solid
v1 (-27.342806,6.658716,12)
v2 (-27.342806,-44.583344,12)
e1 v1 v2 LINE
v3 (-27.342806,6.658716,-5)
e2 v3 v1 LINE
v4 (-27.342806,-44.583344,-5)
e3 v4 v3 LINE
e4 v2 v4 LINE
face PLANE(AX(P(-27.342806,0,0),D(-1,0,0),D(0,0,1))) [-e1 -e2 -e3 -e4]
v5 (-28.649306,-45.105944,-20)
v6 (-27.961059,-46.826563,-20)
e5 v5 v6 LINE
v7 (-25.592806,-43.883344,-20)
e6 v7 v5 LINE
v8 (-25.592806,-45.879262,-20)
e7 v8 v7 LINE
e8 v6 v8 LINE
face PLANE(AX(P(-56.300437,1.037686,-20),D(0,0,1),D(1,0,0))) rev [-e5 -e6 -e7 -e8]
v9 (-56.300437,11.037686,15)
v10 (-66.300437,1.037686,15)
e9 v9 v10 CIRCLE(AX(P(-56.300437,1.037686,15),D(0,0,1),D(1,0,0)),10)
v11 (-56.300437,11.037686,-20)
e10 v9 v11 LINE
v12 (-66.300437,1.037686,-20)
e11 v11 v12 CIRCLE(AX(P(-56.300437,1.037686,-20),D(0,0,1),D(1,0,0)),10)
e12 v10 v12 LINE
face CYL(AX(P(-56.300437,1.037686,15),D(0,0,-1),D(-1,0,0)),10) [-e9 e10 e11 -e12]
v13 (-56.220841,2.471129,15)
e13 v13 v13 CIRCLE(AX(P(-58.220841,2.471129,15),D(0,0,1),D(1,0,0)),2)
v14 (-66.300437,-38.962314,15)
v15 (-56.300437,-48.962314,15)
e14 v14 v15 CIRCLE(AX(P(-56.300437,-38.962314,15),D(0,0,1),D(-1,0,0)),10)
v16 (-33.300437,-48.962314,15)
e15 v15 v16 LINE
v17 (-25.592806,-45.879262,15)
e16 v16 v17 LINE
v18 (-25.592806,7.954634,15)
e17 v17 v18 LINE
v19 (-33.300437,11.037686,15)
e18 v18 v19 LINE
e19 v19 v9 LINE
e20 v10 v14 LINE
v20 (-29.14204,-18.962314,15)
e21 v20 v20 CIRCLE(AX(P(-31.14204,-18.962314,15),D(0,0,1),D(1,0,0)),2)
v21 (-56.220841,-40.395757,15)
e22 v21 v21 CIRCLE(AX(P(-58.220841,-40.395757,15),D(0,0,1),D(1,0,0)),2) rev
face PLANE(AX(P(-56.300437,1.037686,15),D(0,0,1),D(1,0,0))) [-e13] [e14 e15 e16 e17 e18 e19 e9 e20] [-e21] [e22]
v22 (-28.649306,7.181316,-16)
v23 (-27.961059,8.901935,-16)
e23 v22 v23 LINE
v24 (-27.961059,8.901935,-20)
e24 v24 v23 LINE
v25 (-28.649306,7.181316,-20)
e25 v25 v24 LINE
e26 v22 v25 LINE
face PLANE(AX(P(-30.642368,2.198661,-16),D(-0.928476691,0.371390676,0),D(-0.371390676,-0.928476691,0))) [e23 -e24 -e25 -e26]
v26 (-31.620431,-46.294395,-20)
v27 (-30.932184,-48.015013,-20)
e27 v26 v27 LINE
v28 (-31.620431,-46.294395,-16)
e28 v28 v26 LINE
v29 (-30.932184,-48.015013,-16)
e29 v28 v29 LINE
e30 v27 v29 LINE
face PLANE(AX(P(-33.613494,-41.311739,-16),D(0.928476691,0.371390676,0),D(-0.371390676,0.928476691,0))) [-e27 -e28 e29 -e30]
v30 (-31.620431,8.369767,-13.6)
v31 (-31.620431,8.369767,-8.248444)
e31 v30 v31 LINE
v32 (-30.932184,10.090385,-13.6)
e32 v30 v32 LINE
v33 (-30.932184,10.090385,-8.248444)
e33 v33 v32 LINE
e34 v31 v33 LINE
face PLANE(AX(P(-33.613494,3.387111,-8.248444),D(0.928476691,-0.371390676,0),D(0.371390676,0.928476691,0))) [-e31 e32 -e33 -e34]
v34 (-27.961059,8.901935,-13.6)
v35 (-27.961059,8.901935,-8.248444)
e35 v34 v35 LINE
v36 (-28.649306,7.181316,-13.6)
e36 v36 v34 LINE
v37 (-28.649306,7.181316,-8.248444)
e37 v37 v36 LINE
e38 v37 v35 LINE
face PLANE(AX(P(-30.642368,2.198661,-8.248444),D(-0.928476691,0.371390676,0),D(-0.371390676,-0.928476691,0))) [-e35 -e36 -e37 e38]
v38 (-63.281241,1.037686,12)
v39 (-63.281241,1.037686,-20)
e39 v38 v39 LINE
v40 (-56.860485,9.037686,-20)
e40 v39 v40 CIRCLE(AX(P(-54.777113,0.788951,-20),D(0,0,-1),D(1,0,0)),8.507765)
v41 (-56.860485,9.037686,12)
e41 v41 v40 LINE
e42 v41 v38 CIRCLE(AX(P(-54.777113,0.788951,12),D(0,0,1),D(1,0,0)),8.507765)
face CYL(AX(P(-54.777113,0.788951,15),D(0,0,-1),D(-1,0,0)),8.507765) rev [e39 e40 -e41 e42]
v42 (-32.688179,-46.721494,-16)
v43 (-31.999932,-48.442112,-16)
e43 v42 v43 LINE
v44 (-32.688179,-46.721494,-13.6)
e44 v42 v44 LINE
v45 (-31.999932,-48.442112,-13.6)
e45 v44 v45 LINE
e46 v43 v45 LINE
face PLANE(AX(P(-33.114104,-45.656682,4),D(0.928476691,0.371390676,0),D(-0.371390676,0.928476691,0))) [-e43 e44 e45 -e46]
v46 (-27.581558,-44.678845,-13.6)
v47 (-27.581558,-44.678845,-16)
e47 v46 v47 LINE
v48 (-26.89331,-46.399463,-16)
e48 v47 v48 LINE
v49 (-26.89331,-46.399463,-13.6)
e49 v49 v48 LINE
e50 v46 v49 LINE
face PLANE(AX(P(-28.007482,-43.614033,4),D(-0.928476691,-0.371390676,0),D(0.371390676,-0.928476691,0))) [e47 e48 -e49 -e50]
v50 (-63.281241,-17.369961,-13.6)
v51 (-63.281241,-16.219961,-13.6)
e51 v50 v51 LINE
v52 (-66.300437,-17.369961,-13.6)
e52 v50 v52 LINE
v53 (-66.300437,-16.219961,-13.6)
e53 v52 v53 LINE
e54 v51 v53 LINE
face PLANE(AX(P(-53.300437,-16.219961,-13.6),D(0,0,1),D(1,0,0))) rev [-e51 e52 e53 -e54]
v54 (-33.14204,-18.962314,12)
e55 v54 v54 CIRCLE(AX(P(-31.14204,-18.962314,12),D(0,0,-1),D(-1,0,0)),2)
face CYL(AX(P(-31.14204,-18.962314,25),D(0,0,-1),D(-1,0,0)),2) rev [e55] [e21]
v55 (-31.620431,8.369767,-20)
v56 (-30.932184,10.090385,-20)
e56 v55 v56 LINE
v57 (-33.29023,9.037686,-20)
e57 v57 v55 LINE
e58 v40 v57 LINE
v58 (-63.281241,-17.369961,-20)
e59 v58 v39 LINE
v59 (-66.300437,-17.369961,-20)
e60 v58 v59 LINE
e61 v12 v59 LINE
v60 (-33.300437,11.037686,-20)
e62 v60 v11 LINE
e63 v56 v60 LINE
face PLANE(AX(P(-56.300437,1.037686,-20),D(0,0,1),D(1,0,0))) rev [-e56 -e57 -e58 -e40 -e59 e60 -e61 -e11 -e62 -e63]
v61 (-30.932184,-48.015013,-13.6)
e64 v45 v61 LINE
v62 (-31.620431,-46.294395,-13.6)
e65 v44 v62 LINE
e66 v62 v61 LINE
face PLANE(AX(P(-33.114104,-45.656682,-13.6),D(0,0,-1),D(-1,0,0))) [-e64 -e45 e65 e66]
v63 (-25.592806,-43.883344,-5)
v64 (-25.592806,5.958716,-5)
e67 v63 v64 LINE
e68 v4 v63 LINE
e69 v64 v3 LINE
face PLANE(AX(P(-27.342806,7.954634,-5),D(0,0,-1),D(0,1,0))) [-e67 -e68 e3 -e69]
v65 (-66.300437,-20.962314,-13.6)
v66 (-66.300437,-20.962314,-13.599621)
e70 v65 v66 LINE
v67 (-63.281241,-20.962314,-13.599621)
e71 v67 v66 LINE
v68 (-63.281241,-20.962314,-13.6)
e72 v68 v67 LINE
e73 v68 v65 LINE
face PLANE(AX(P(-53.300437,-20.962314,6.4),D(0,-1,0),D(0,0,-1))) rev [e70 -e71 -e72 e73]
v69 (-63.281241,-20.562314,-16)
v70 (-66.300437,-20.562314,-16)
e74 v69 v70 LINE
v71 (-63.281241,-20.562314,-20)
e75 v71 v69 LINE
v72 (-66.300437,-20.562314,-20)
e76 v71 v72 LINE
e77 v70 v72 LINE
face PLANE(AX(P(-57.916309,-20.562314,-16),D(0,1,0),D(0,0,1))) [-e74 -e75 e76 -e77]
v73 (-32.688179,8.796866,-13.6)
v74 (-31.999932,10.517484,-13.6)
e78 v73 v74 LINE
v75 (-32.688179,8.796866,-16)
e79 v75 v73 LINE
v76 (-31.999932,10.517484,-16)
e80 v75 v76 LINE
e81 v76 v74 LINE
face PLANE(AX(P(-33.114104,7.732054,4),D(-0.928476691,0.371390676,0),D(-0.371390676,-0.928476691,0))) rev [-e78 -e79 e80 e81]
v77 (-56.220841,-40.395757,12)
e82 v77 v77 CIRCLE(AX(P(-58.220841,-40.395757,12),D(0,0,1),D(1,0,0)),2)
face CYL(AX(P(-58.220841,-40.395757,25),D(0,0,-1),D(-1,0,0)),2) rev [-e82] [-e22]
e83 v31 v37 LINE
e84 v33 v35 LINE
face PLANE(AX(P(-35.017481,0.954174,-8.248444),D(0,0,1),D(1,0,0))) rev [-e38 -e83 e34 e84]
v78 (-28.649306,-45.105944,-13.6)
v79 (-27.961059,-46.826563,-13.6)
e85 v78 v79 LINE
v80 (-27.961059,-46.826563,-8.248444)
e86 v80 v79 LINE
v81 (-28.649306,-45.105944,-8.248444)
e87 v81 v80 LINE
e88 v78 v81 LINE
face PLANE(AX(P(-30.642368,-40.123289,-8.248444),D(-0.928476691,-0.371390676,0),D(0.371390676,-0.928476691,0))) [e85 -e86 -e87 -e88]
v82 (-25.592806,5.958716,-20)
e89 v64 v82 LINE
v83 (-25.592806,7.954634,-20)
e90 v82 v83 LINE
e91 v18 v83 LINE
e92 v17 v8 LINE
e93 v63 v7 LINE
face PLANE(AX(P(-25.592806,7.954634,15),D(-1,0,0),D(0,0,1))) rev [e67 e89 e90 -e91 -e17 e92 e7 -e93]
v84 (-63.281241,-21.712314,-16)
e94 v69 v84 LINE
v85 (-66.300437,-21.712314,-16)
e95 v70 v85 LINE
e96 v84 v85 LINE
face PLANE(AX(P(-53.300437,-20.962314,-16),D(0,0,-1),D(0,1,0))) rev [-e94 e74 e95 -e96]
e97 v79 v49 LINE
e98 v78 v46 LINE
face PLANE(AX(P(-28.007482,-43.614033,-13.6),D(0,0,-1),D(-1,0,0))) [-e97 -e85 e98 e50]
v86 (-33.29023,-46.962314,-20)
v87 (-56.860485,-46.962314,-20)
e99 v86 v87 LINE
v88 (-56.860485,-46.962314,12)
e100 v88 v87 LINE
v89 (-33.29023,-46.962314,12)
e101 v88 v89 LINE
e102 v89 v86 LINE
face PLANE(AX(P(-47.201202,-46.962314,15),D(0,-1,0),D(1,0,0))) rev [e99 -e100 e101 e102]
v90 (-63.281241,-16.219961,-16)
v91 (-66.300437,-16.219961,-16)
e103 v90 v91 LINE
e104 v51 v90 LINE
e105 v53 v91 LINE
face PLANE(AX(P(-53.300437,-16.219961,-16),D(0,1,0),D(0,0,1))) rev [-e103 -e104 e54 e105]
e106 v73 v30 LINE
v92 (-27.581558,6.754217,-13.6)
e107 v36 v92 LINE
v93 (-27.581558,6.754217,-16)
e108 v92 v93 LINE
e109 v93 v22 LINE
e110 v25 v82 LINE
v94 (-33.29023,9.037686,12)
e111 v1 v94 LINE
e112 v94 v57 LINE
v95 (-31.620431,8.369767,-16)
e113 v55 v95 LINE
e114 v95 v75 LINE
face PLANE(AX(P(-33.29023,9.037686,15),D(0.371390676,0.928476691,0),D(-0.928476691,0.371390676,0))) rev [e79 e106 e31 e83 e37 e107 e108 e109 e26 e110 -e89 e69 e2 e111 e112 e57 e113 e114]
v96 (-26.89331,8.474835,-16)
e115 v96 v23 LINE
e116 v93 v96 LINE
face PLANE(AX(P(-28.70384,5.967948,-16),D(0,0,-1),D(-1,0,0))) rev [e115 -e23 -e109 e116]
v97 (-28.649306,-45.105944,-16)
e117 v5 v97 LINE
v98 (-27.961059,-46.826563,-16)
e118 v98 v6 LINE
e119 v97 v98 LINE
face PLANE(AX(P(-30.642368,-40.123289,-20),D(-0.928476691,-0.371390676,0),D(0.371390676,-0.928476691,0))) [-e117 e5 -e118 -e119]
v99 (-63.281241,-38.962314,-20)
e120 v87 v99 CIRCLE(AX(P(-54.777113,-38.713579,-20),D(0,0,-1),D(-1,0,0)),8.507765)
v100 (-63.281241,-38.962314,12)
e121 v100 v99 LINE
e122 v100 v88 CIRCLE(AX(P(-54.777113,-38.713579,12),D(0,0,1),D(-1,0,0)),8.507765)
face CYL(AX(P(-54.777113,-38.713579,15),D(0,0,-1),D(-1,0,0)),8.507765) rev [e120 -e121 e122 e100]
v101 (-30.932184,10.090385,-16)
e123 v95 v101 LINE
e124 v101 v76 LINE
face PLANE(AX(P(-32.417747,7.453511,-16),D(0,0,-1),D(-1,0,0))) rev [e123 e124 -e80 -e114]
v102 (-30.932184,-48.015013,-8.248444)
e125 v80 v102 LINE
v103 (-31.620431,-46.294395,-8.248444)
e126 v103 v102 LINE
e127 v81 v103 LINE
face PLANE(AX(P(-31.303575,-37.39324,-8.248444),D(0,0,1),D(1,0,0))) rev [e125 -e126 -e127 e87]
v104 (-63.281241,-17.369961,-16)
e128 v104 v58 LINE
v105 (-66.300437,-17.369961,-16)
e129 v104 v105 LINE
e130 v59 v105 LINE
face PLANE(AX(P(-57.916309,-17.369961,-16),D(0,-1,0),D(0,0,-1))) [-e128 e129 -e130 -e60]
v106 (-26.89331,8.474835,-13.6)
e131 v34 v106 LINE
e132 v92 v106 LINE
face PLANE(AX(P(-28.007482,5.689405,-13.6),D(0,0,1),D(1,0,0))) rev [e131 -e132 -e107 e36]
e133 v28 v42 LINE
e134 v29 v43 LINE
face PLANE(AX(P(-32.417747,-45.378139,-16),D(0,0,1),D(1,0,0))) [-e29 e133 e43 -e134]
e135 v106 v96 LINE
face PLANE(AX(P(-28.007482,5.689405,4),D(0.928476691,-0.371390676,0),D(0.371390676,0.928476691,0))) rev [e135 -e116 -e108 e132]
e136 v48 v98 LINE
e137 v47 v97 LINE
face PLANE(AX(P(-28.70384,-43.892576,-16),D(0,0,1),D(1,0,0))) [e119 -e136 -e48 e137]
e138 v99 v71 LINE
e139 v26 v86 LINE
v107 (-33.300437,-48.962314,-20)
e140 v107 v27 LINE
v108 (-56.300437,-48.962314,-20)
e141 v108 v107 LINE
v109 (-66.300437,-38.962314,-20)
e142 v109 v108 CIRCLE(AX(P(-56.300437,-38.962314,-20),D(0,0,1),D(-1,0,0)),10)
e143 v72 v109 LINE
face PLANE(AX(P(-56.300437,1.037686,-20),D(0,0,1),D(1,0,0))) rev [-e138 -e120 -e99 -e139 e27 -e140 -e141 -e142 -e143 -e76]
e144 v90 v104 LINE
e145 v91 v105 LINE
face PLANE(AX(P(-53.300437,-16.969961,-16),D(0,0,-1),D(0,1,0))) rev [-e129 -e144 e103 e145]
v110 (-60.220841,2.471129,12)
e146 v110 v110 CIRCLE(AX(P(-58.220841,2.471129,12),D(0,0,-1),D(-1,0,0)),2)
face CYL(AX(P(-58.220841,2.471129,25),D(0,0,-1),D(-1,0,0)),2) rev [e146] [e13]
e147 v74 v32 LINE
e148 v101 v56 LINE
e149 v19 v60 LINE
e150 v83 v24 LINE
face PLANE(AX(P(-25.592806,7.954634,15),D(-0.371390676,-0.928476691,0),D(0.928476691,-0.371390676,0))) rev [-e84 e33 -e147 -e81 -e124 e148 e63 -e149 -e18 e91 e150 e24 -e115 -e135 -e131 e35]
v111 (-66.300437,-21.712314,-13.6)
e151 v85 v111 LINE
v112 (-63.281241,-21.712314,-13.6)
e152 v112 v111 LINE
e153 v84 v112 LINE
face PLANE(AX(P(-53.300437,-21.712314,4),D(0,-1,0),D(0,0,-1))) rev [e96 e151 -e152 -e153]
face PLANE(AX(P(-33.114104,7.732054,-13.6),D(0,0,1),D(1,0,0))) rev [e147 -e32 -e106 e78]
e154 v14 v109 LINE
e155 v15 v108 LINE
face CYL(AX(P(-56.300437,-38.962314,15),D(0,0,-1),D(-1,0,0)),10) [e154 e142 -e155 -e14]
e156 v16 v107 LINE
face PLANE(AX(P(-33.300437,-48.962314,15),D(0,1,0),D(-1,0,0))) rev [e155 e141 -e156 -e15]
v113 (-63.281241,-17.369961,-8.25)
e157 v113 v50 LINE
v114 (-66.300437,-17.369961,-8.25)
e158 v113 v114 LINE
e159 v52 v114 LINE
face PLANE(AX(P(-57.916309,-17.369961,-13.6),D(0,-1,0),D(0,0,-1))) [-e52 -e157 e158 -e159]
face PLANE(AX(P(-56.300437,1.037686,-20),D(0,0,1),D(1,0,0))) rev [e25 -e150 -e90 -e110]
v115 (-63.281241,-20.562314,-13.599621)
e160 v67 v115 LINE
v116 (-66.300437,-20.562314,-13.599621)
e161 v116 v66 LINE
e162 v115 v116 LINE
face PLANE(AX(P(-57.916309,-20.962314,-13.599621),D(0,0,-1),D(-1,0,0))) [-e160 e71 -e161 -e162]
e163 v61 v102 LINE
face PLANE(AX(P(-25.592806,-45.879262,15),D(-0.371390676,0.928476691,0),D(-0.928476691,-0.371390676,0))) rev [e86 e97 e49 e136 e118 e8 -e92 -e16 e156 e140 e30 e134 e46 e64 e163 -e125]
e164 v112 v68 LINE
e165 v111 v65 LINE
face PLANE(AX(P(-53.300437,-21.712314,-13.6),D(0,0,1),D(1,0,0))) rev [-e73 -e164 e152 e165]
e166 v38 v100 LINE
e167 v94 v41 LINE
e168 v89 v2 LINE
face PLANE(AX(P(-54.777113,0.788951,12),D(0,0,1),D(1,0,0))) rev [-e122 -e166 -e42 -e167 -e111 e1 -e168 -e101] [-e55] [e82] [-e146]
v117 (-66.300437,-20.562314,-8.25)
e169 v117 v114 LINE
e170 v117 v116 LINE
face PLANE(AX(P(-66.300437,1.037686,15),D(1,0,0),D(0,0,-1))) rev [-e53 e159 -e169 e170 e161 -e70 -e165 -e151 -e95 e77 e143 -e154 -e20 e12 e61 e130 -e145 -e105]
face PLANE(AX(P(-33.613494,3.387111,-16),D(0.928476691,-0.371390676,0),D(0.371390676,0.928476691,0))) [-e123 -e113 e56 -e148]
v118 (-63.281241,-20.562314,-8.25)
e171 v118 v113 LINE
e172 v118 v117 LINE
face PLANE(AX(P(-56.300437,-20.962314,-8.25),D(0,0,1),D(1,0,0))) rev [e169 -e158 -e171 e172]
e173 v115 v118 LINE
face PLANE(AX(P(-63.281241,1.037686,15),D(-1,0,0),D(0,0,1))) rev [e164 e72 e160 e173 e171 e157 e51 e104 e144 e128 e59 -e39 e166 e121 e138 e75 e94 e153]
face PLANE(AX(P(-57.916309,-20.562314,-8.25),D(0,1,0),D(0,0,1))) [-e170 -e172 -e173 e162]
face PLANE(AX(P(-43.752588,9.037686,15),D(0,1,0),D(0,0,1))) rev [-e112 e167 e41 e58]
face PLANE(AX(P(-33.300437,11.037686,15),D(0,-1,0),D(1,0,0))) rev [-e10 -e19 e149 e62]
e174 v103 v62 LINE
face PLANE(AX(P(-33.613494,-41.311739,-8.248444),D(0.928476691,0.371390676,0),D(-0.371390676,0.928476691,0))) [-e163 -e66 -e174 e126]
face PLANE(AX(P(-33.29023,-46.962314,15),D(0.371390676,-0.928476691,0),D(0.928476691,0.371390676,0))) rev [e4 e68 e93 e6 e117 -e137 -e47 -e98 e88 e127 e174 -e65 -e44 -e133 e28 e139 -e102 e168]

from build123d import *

# Parameters (mm, degrees)
BOSS_EXTRU_1_DEPTH            = 15
BOSS_EXTRU_2_START            = -3
BOSS_EXTRU_2_DEPTH            = 3
ENL_V_MAT_EXTRU_2_DEPTH       = 3
ENL_V_MAT_EXTRU_3_DEPTH       = 13
ESQUISSE8_R                   = 2
ENL_V_MAT_EXTRU_4_DEPTH       = 13
D_PLACER_START                = -20
D_PLACER_LA_FACE1_DEPTH       = 20
D_PLACER_START_2              = -12.248443577
D_PLACER_LA_FACE1_2_OUTLINE_W = 3.019195257
D_PLACER_LA_FACE1_2_OUTLINE_H = 5.492352827
D_PLACER_LA_FACE1_2_DEPTH     = 20
D_PLACER_LA_FACE1_3_OUTLINE_W = 3.019195257
D_PLACER_LA_FACE1_3_OUTLINE_H = 0.75
D_PLACER_LA_FACE1_3_DEPTH     = 4
D_PLACER_START_3              = -13.6
D_PLACER_LA_FACE1_4_OUTLINE_W = 3.019195257
D_PLACER_LA_FACE1_4_OUTLINE_H = 0.75
D_PLACER_LA_FACE1_4_DEPTH     = 1.351556423
D_PLACER_START_4              = -12.25
D_PLACER_LA_FACE1_5_OUTLINE_W = 3.019195257
D_PLACER_LA_FACE1_5_OUTLINE_H = 3.992352827
D_PLACER_LA_FACE1_5_DEPTH     = 0.001556423
ESQUISSE9_W                   = 4
ESQUISSE9_H                   = 4
ENL_V_MAT_EXTRU_5_DEPTH       = 10
ESQUISSE10_W                  = 4
ESQUISSE10_H                  = 4
ENL_V_MAT_EXTRU_6_DEPTH       = 10
ESQUISSE11_W                  = 4
ESQUISSE11_H                  = 3.962828904
ENL_V_MAT_EXTRU_7_DEPTH       = 10
ESQUISSE12_W                  = 0.4
ESQUISSE12_H                  = 5.351556423
ESQUISSE12_H_2                = 4
BOSS_EXTRU_4_DEPTH            = 1.853162708
ESQUISSE13_W                  = 0.4
ESQUISSE13_H                  = 5.351556423
ESQUISSE13_H_2                = 4
BOSS_EXTRU_5_DEPTH            = 1.853162708
ESQUISSE14_W                  = 5.349621474
ESQUISSE14_H                  = 0.4
ESQUISSE14_W_2                = 4
ESQUISSE14_W_3                = 5.35
BOSS_EXTRU_6_DEPTH            = 3.019195257
ESQUISSE16_W                  = 20
ESQUISSE16_H                  = 53.833895408
BOSS_EXTRU_7_DEPTH            = 1.75


# Read off the part's stored shape, not the designer's step: Déplacer la face1
with BuildPart() as part:
    # Esquisse2 → Boss.-Extru.1 (new body)
    with BuildSketch(Plane.XY):
        with BuildLine():
            Line((-33.300436576, 11.037686006), (-56.300436576, 11.037686006))
            ThreePointArc((-56.300436576, 11.037686006), (-63.371504388, 8.108753818), (-66.300436576, 1.037686006))
            Line((-66.300436576, 1.037686006), (-66.300436576, -38.962313994))
            ThreePointArc((-66.300436576, -38.962313994), (-63.371504388, -46.033381806), (-56.300436576, -48.962313994))
            Line((-56.300436576, -48.962313994), (-33.300436576, -48.962313994))
            Line((-33.300436576, -48.962313994), (-25.592805837, -45.879261698))
            Line((-25.592805837, -45.879261698), (-25.592805837, -43.883344379))
            Line((-25.592805837, -43.883344379), (-33.290229876, -46.962313994))
            Line((-33.290229876, -46.962313994), (-43.752587859, -46.962313994))
            Line((-43.752587859, -46.962313994), (-47.201202175, -46.962313994))
            Line((-47.201202175, -46.962313994), (-56.860485242, -46.962313994))
            ThreePointArc((-56.860485242, -46.962313994), (-61.412155775, -44.038827986), (-63.281241319, -38.962313994))
            Line((-63.281241319, -38.962313994), (-63.281241319, -24.376108696))
            Line((-63.281241319, -24.376108696), (-63.281241319, -13.548519292))
            Line((-63.281241319, -13.548519292), (-63.281241319, 1.037686006))
            ThreePointArc((-63.281241319, 1.037686006), (-61.412155775, 6.114199998), (-56.860485242, 9.037686006))
            Line((-56.860485242, 9.037686006), (-47.201202175, 9.037686006))
            Line((-47.201202175, 9.037686006), (-43.752587859, 9.037686006))
            Line((-43.752587859, 9.037686006), (-33.290229876, 9.037686006))
            Line((-33.290229876, 9.037686006), (-25.592805837, 5.958716391))
            Line((-25.592805837, 5.958716391), (-25.592805837, 7.95463371))
            Line((-25.592805837, 7.95463371), (-33.300436576, 11.037686006))
        make_face()
    extrude(amount=BOSS_EXTRU_1_DEPTH)

    # Esquisse4 → Boss.-Extru.2 (add)
    with BuildSketch(Plane.XY.offset(15).offset(BOSS_EXTRU_2_START)):
        with BuildLine():
            Line((-25.592805837, 5.958716391), (-33.290229876, 9.037686006))
            Line((-33.290229876, 9.037686006), (-56.860485242, 9.037686006))
            ThreePointArc((-56.860485242, 9.037686006), (-61.412155775, 6.114199998), (-63.281241319, 1.037686006))
            Line((-63.281241319, 1.037686006), (-63.281241319, -38.962313994))
            ThreePointArc((-63.281241319, -38.962313994), (-61.412155775, -44.038827986), (-56.860485242, -46.962313994))
            Line((-56.860485242, -46.962313994), (-33.290229876, -46.962313994))
            Line((-33.290229876, -46.962313994), (-25.592805837, -43.883344379))
            Line((-25.592805837, -43.883344379), (-25.592805837, 5.958716391))
        make_face()
    extrude(amount=BOSS_EXTRU_2_DEPTH)

    # Esquisse6 → Enlèv. mat.-Extru.2 (cut)
    with BuildSketch(Plane(origin=(-0.787065043, -1.967662607, 0), x_dir=(0.9284766908852589, -0.37139067635410505, 0), z_dir=(0.37139067635410505, 0.9284766908852589, 0))):
        Polygon((-32.867286648, 0), (-32.867286648, -4), (-33.617286648, -4), (-33.617286648, -6.4), (-32.867286648, -6.4), (-32.867286648, -7.751556423), (-28.867286648, -7.751556423), (-28.867286648, -6.4), (-28.117286648, -6.4), (-28.117286648, -4), (-28.867286648, -4), (-28.867286648, 0), align=None)
    enl_v_mat_extru_2 = extrude(amount=-ENL_V_MAT_EXTRU_2_DEPTH, mode=Mode.SUBTRACT)

    # Symétrie1: Enlèv. mat.-Extru.2 across plane
    add(enl_v_mat_extru_2.mirror(Plane(origin=(0, -18.962313994, 0), x_dir=(0, 0, 1), z_dir=(0, -1, 0))), mode=Mode.SUBTRACT)

    # Esquisse7 → Enlèv. mat.-Extru.3 (cut)
    with BuildSketch(Plane.ZY.offset(66.300436576)):
        Polygon((0, -20.962313994), (0, -16.969961167), (4, -16.969961167), (4, -16.219961167), (6.4, -16.219961167), (6.4, -16.969961167), (7.75, -16.969961167), (7.75, -20.962313994), (6.4, -20.962313994), (6.4, -21.712313994), (4, -21.712313994), (4, -20.962313994), align=None)
    extrude(amount=-ENL_V_MAT_EXTRU_3_DEPTH, mode=Mode.SUBTRACT)

    # Esquisse8 → Enlèv. mat.-Extru.4 (cut)
    with BuildSketch(Plane(origin=(0, 0, 12), x_dir=(-1, 0, 0), z_dir=(0, 0, -1))):
        with Locations((58.220840839, 2.471128854)):
            Circle(ESQUISSE8_R)
        with Locations(Location((58.220840839, -40.395756842, 0), (0, 0, 180))):
            Circle(ESQUISSE8_R)
        with Locations((31.142040455, -18.962313994)):
            Circle(ESQUISSE8_R)
    extrude(amount=-ENL_V_MAT_EXTRU_4_DEPTH, mode=Mode.SUBTRACT)

    # Déplacer la face1 outline → Déplacer la face1 (add)
    with BuildSketch(Plane.XY.offset(D_PLACER_START)):
        with BuildLine():
            Line((-32.688179458, -46.721493827), (-33.290229876, -46.962313994))
            Line((-33.290229876, -46.962313994), (-56.860485242, -46.962313994))
            ThreePointArc((-56.860485242, -46.962313994), (-61.412155775, -44.038827986), (-63.281241319, -38.962313994))
            Line((-63.281241319, -38.962313994), (-63.281241319, -21.712313994))
            Line((-63.281241319, -21.712313994), (-66.300436576, -21.712313994))
            Line((-66.300436576, -21.712313994), (-66.300436576, -38.962313994))
            ThreePointArc((-66.300436576, -38.962313994), (-63.371504388, -46.033381806), (-56.300436576, -48.962313994))
            Line((-56.300436576, -48.962313994), (-33.300436576, -48.962313994))
            Line((-33.300436576, -48.962313994), (-31.999932107, -48.442112206))
            Line((-31.999932107, -48.442112206), (-32.688179458, -46.721493827))
        make_face()
        Polygon((-25.592805837, -43.883344379), (-27.581557658, -44.678845107), (-26.893310307, -46.399463486), (-25.592805837, -45.879261698), align=None)
        Polygon((-27.581557658, 6.754217119), (-25.592805837, 5.958716391), (-25.592805837, 7.95463371), (-26.893310307, 8.474835498), align=None)
        with BuildLine():
            Line((-66.300436576, -16.219961167), (-63.281241319, -16.219961167))
            Line((-63.281241319, -16.219961167), (-63.281241319, 1.037686006))
            ThreePointArc((-63.281241319, 1.037686006), (-61.412155775, 6.114199998), (-56.860485242, 9.037686006))
            Line((-56.860485242, 9.037686006), (-33.290229876, 9.037686006))
            Line((-33.290229876, 9.037686006), (-32.688179458, 8.796865839))
            Line((-32.688179458, 8.796865839), (-31.999932107, 10.517484218))
            Line((-31.999932107, 10.517484218), (-33.300436576, 11.037686006))
            Line((-33.300436576, 11.037686006), (-56.300436576, 11.037686006))
            ThreePointArc((-56.300436576, 11.037686006), (-63.371504388, 8.108753818), (-66.300436576, 1.037686006))
            Line((-66.300436576, 1.037686006), (-66.300436576, -16.219961167))
        make_face()
    extrude(amount=D_PLACER_LA_FACE1_DEPTH)

    # D_placer la face1 2 outline → D_placer la face1 2 (add)
    with BuildSketch(Plane.XY.offset(D_PLACER_START_2)):
        Polygon((-32.688179458, -46.721493827), (-31.999932107, -48.442112206), (-26.893310307, -46.399463486), (-27.581557658, -44.678845107), align=None)
        with Locations((-64.790838948, -18.966137581)):
            Rectangle(D_PLACER_LA_FACE1_2_OUTLINE_W, D_PLACER_LA_FACE1_2_OUTLINE_H)
        Polygon((-27.581557658, 6.754217119), (-26.893310307, 8.474835498), (-31.999932107, 10.517484218), (-32.688179458, 8.796865839), align=None)
    extrude(amount=D_PLACER_LA_FACE1_2_DEPTH)

    # D_placer la face1 3 outline → D_placer la face1 3 (add)
    with BuildSketch(Plane.XY.offset(D_PLACER_START)):
        Polygon((-31.99182194, -46.44295082), (-32.688179458, -46.721493827), (-31.999932107, -48.442112206), (-31.303574589, -48.163569199), align=None)
        Polygon((-27.581557658, -44.678845107), (-28.277915177, -44.957388115), (-27.589667825, -46.678006494), (-26.893310307, -46.399463486), align=None)
        with Locations((-64.790838948, -21.337313994)):
            Rectangle(D_PLACER_LA_FACE1_3_OUTLINE_W, D_PLACER_LA_FACE1_3_OUTLINE_H)
        with Locations((-64.790838948, -16.594961167)):
            Rectangle(D_PLACER_LA_FACE1_3_OUTLINE_W, D_PLACER_LA_FACE1_3_OUTLINE_H)
        Polygon((-28.277915177, 7.032760127), (-27.581557658, 6.754217119), (-26.893310307, 8.474835498), (-27.589667825, 8.753378505), align=None)
        Polygon((-32.688179458, 8.796865839), (-31.99182194, 8.518322832), (-31.303574589, 10.238941211), (-31.999932107, 10.517484218), align=None)
    extrude(amount=D_PLACER_LA_FACE1_3_DEPTH)

    # D_placer la face1 4 outline → D_placer la face1 4 (add)
    with BuildSketch(Plane.XY.offset(D_PLACER_START_3)):
        Polygon((-31.99182194, -46.44295082), (-32.688179458, -46.721493827), (-31.999932107, -48.442112206), (-31.303574589, -48.163569199), align=None)
        Polygon((-27.581557658, -44.678845107), (-28.277915177, -44.957388115), (-27.589667825, -46.678006494), (-26.893310307, -46.399463486), align=None)
        with Locations((-64.790838948, -21.337313994)):
            Rectangle(D_PLACER_LA_FACE1_4_OUTLINE_W, D_PLACER_LA_FACE1_4_OUTLINE_H)
        with Locations((-64.790838948, -16.594961167)):
            Rectangle(D_PLACER_LA_FACE1_4_OUTLINE_W, D_PLACER_LA_FACE1_4_OUTLINE_H)
        Polygon((-28.277915177, 7.032760127), (-27.581557658, 6.754217119), (-26.893310307, 8.474835498), (-27.589667825, 8.753378505), align=None)
        Polygon((-32.688179458, 8.796865839), (-31.99182194, 8.518322832), (-31.303574589, 10.238941211), (-31.999932107, 10.517484218), align=None)
    extrude(amount=D_PLACER_LA_FACE1_4_DEPTH)

    # D_placer la face1 5 outline → D_placer la face1 5 (add)
    with BuildSketch(Plane.XY.offset(D_PLACER_START_4)):
        with Locations((-64.790838948, -18.966137581)):
            Rectangle(D_PLACER_LA_FACE1_5_OUTLINE_W, D_PLACER_LA_FACE1_5_OUTLINE_H)
    extrude(amount=D_PLACER_LA_FACE1_5_DEPTH)

    # Esquisse9 → Enlèv. mat.-Extru.5 (cut)
    with BuildSketch(Plane(origin=(12.290392884, -30.72598221, 0), x_dir=(0.928476690885259, 0.3713906763541048, 0), z_dir=(0.3713906763541047, -0.9284766908852589, 0))):
        with Locations((-44.952139887, -10.248443577)):
            Rectangle(ESQUISSE9_W, ESQUISSE9_H)
    extrude(amount=-ENL_V_MAT_EXTRU_5_DEPTH, mode=Mode.SUBTRACT)

    # Esquisse10 → Enlèv. mat.-Extru.6 (cut)
    with BuildSketch(Plane(origin=(-0.787065043, -1.967662607, 0), x_dir=(0.9284766908852589, -0.37139067635410505, 0), z_dir=(0.37139067635410505, 0.9284766908852589, 0))):
        with Locations((-30.867286648, 10.248443577)):
            Rectangle(ESQUISSE10_W, ESQUISSE10_H)
    extrude(amount=-ENL_V_MAT_EXTRU_6_DEPTH, mode=Mode.SUBTRACT)

    # Esquisse11 → Enlèv. mat.-Extru.7 (cut)
    with BuildSketch(Plane.ZY.offset(66.300436576)):
        with Locations((-10.25, -18.980899542)):
            Rectangle(ESQUISSE11_W, ESQUISSE11_H)
    extrude(amount=-ENL_V_MAT_EXTRU_7_DEPTH, mode=Mode.SUBTRACT)

    # Esquisse12 → Boss.-Extru.4 (add)
    with BuildSketch(Plane(origin=(-0.787065043, -1.967662607, 0), x_dir=(0.9284766908852589, -0.37139067635410505, 0), z_dir=(0.37139067635410505, 0.9284766908852589, 0))):
        with Locations((-32.667286648, 10.924221789)):
            Rectangle(ESQUISSE12_W, ESQUISSE12_H)
        with Locations((-32.667286648, 18)):
            Rectangle(ESQUISSE12_W, ESQUISSE12_H_2)
        with Locations((-29.067286648, 18)):
            Rectangle(ESQUISSE12_W, ESQUISSE12_H_2)
        with Locations((-29.067286648, 10.924221789)):
            Rectangle(ESQUISSE12_W, ESQUISSE12_H)
    extrude(amount=-BOSS_EXTRU_4_DEPTH)

    # Esquisse13 → Boss.-Extru.5 (add)
    with BuildSketch(Plane(origin=(12.290392884, -30.72598221, 0), x_dir=(0.928476690885259, 0.3713906763541048, 0), z_dir=(0.3713906763541047, -0.9284766908852589, 0))):
        with Locations((-43.152139887, -10.924221789)):
            Rectangle(ESQUISSE13_W, ESQUISSE13_H)
        with Locations((-46.752139887, -10.924221789)):
            Rectangle(ESQUISSE13_W, ESQUISSE13_H)
        with Locations((-46.752139887, -18)):
            Rectangle(ESQUISSE13_W, ESQUISSE13_H_2)
        with Locations((-43.152139887, -18)):
            Rectangle(ESQUISSE13_W, ESQUISSE13_H_2)
    extrude(amount=-BOSS_EXTRU_5_DEPTH)

    # Esquisse14 → Boss.-Extru.6 (add)
    with BuildSketch(Plane.ZY.offset(66.300436576)):
        with Locations((-10.924810737, -20.762313994)):
            Rectangle(ESQUISSE14_W, ESQUISSE14_H)
        with Locations((-18, -17.169961167)):
            Rectangle(ESQUISSE14_W_2, ESQUISSE14_H)
        with Locations((-18, -20.762313994)):
            Rectangle(ESQUISSE14_W_2, ESQUISSE14_H)
        with Locations((-10.925, -17.169961167)):
            Rectangle(ESQUISSE14_W_3, ESQUISSE14_H)
    extrude(amount=-BOSS_EXTRU_6_DEPTH)

    # Esquisse16 → Boss.-Extru.7 (add)
    with BuildSketch(Plane(origin=(-25.592805837, 0, 0), x_dir=(0, 0, -1), z_dir=(1, 0, 0))):
        with Locations((-5, -18.962313994)):
            Rectangle(ESQUISSE16_W, ESQUISSE16_H)
    extrude(amount=-BOSS_EXTRU_7_DEPTH)


solid = part.part
